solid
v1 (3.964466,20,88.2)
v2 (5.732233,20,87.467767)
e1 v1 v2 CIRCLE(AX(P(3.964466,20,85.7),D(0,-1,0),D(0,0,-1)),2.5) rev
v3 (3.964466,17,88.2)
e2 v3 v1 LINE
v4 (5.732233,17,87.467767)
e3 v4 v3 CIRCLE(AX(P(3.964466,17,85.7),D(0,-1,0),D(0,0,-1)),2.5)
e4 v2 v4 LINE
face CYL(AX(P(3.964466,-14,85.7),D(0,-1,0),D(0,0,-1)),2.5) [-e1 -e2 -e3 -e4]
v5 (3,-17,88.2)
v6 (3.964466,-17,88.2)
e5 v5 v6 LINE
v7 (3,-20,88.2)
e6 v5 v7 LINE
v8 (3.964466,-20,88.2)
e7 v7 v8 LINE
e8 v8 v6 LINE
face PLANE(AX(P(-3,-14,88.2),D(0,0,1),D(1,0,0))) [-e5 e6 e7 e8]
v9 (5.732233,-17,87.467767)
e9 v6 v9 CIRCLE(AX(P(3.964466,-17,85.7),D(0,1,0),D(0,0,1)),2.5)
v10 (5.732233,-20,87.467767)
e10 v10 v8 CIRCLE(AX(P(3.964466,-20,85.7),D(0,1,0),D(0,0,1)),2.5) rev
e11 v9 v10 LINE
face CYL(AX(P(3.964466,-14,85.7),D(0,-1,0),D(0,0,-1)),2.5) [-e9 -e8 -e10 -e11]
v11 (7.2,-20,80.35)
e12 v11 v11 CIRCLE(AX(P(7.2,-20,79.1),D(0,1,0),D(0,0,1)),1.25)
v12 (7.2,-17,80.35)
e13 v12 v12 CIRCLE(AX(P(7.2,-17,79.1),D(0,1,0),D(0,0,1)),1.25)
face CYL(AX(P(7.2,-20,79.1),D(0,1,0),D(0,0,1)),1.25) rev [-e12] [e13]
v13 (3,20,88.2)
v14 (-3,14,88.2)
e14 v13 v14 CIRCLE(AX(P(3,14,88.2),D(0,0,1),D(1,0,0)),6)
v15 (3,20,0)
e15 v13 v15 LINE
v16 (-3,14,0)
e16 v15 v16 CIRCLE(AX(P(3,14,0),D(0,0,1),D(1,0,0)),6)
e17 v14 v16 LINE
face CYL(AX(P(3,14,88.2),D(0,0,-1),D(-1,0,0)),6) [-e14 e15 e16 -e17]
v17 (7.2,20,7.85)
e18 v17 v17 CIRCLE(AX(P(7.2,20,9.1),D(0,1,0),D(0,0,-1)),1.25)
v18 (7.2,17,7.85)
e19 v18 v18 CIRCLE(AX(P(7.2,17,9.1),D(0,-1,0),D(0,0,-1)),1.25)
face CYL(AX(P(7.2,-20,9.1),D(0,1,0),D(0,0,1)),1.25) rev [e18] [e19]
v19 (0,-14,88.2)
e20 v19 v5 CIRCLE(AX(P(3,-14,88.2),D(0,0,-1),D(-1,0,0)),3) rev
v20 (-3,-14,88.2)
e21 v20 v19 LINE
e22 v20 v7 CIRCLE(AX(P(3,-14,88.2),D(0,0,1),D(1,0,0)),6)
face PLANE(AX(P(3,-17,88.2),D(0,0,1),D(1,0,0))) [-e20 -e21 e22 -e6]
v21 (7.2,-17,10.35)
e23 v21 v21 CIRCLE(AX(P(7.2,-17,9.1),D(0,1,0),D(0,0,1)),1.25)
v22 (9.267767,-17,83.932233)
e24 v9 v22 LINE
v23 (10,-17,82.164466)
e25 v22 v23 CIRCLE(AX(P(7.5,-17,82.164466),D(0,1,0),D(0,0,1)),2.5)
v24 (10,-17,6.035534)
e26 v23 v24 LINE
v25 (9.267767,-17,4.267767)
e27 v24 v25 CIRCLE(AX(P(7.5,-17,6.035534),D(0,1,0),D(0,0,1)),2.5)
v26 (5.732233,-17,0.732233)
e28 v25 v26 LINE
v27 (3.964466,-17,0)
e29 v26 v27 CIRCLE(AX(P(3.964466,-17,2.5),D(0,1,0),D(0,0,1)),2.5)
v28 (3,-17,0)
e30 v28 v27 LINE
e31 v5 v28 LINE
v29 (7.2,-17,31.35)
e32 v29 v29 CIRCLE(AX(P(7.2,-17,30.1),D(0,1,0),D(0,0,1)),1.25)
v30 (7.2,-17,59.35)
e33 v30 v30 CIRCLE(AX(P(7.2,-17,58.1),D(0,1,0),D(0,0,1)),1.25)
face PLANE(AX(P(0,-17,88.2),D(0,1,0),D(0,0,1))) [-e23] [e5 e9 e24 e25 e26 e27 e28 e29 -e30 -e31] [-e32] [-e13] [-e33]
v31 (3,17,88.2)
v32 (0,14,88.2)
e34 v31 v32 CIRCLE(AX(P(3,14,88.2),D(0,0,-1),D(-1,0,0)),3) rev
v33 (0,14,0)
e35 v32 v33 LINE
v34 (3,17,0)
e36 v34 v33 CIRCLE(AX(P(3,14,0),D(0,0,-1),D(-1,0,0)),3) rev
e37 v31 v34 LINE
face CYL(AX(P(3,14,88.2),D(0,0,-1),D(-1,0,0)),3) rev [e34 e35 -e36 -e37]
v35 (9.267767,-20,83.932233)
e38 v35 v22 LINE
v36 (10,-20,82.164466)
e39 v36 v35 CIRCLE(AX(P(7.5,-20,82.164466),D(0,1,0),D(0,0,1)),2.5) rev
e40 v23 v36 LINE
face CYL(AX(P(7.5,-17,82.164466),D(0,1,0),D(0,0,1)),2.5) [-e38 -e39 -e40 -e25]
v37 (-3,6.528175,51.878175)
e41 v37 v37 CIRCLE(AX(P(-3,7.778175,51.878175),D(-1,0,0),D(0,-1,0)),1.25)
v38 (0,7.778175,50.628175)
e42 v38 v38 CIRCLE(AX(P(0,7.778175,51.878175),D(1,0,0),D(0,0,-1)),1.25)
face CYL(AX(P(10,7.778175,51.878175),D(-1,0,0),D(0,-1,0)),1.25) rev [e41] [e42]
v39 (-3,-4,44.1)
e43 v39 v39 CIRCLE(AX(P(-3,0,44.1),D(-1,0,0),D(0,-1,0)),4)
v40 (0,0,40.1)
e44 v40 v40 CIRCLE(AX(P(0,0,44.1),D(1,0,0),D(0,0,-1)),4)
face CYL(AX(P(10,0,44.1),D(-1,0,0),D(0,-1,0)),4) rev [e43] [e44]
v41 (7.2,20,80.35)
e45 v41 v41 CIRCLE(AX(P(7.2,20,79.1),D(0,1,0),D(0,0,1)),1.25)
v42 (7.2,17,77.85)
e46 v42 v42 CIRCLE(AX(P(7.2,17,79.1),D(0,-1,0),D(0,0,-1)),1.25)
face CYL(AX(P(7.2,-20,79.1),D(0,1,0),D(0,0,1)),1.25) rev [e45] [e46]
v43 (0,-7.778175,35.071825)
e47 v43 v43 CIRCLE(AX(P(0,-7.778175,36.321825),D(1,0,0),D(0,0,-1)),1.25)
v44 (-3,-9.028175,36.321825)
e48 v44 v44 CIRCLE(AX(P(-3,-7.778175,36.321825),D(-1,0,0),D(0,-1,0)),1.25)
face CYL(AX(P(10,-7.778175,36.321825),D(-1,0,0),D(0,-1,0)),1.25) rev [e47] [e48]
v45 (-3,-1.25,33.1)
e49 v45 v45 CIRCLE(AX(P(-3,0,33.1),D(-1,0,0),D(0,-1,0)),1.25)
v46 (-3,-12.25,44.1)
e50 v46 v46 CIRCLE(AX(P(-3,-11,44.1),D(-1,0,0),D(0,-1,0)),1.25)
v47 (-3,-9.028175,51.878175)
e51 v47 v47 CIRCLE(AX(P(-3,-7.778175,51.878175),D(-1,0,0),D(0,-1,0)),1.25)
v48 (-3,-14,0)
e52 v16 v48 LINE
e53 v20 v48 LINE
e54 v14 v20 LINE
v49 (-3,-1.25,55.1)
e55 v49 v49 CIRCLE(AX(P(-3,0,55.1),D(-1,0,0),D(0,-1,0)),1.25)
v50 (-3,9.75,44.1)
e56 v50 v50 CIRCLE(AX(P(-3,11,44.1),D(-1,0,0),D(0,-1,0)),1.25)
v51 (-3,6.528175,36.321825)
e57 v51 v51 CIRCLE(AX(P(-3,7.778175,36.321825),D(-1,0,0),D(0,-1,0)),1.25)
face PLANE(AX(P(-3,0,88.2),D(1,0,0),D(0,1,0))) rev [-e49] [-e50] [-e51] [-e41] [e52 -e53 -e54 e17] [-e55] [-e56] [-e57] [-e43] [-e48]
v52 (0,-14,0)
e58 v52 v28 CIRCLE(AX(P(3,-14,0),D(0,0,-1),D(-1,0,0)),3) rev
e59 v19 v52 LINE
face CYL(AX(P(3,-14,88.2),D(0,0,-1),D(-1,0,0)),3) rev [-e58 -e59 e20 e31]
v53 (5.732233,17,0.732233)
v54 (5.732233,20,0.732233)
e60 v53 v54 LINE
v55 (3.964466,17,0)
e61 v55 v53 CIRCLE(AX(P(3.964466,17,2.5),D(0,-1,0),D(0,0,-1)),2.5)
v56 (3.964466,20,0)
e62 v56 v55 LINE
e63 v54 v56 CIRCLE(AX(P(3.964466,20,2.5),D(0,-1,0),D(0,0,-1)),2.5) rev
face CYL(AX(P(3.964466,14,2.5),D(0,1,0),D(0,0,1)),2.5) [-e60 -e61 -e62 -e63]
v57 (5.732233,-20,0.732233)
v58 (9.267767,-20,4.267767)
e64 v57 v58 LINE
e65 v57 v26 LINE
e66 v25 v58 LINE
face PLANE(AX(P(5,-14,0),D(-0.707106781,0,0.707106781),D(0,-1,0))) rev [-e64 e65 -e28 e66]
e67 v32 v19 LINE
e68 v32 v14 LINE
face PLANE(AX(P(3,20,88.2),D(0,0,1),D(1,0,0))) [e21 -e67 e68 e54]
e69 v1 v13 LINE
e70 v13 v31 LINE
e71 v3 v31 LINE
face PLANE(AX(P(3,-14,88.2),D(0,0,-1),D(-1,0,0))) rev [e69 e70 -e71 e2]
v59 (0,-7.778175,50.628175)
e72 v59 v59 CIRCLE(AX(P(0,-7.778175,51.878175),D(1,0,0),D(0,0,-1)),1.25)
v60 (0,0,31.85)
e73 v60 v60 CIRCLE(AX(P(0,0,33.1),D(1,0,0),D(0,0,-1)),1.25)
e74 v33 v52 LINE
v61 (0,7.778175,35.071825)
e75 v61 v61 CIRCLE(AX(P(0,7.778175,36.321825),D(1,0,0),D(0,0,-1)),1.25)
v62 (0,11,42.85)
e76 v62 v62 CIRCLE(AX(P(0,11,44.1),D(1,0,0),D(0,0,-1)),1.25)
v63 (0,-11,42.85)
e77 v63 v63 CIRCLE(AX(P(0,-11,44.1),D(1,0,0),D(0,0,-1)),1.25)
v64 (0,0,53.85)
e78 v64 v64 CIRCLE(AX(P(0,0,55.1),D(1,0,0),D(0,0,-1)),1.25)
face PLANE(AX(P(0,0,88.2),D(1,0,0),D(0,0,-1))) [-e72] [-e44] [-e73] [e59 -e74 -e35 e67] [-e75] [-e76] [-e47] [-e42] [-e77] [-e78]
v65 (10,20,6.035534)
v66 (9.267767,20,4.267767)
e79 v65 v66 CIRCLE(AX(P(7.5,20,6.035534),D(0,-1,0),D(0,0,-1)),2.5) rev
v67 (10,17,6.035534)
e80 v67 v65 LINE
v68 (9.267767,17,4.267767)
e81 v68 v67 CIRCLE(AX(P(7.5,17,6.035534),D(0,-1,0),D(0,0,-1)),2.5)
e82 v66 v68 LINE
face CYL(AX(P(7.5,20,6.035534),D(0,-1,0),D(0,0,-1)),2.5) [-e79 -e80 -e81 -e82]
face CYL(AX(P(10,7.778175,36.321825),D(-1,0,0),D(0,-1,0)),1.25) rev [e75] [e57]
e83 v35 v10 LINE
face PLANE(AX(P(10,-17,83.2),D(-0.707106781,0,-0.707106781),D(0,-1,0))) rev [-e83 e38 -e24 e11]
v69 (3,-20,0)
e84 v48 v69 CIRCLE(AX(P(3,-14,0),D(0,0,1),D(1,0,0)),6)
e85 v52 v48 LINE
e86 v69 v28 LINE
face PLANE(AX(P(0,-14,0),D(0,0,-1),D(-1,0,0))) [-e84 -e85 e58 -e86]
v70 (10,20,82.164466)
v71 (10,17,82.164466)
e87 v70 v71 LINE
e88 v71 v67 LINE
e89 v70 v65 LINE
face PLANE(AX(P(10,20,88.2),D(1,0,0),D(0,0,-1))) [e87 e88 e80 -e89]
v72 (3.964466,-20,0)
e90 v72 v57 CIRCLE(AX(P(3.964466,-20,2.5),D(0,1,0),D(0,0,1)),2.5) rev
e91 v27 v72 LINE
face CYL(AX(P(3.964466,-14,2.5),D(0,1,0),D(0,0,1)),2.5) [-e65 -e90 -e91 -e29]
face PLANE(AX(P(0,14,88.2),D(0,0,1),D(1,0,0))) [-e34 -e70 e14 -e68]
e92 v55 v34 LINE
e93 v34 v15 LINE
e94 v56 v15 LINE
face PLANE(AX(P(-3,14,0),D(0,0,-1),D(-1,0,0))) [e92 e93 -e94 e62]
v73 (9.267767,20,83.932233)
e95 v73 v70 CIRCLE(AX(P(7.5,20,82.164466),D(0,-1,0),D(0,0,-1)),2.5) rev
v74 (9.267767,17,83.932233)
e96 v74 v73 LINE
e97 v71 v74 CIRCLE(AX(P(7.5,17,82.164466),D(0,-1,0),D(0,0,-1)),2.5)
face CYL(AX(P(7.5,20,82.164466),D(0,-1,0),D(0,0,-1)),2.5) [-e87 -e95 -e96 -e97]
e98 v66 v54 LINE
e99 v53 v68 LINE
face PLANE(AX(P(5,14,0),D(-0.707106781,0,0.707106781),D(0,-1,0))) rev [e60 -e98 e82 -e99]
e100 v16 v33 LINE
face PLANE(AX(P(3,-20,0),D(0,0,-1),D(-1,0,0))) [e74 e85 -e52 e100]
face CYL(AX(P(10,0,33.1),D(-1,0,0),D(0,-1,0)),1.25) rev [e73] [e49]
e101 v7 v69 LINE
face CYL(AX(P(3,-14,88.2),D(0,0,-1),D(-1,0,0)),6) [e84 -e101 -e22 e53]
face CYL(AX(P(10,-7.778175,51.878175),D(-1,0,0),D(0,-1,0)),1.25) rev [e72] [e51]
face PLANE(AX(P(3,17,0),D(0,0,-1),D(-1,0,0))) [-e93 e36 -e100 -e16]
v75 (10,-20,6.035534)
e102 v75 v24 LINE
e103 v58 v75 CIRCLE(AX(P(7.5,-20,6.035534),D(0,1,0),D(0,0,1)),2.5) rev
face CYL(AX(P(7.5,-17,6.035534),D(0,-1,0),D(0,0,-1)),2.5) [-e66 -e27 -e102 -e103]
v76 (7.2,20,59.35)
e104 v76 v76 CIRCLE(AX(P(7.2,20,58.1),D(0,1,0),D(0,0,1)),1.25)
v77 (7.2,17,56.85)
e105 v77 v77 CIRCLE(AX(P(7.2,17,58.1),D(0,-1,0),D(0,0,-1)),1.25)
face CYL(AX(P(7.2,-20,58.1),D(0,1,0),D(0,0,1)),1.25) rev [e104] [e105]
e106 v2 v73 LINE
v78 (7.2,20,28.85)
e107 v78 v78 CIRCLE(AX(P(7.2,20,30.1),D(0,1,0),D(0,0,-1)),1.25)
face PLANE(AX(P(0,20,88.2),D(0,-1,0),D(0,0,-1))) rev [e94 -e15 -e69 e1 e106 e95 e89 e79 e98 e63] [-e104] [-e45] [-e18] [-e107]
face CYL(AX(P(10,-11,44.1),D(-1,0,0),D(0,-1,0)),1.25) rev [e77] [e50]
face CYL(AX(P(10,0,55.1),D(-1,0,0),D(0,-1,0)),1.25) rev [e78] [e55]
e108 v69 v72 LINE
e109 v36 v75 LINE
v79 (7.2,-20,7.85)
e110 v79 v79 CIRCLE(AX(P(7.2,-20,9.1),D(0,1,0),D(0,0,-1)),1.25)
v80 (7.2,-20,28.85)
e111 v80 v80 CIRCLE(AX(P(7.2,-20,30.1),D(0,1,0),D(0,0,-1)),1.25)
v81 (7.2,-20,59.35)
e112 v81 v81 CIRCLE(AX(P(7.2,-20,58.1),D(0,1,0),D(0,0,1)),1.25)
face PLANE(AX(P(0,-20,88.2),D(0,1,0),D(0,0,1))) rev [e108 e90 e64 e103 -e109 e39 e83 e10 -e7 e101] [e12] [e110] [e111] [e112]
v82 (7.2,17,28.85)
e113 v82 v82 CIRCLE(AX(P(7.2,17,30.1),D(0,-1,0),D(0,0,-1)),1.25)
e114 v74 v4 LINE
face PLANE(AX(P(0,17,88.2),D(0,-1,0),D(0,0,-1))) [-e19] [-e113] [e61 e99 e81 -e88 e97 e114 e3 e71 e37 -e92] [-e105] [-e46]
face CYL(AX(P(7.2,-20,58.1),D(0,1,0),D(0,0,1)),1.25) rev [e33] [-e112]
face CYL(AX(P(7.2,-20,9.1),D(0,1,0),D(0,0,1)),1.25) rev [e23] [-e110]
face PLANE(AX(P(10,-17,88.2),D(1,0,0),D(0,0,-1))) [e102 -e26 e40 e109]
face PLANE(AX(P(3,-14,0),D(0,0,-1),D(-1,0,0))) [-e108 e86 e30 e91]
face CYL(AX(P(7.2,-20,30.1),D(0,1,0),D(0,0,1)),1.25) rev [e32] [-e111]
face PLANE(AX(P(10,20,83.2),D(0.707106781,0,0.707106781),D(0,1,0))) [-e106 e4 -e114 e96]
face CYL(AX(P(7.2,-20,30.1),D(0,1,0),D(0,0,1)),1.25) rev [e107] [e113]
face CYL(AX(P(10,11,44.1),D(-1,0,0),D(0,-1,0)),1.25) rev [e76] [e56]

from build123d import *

# Parameters (mm, degrees)
BASE_FLANGE1_DEPTH = 88.2
CHAMFER1_SIZE      = 5
FILLET1_R          = 2.5
SKETCH4_R          = 4
CUT_EXTRUDE1_DEPTH = 92.368703613
SKETCH5_R          = 1.25
CUT_EXTRUDE2_DEPTH = 92.368703613
SKETCH6_R          = 1.25
CUT_EXTRUDE3_DEPTH = 98.361388651


# Sheet-metal steps are written as plain solids
with BuildPart() as part:
    # Sketch1 → Base-Flange1 (new body)
    with BuildSketch(Plane.XY):
        with BuildLine():
            Line((10, -17), (3, -17))
            ThreePointArc((3, -17), (0.878679656, -16.121320344), (0, -14))
            Line((0, -14), (0, 0))
            Line((0, 0), (0, 14))
            ThreePointArc((0, 14), (0.878679656, 16.121320344), (3, 17))
            Line((3, 17), (10, 17))
            Line((10, 17), (10, 20))
            Line((10, 20), (3, 20))
            ThreePointArc((3, 20), (-1.242640687, 18.242640687), (-3, 14))
            Line((-3, 14), (-3, 0))
            Line((-3, 0), (-3, -14))
            ThreePointArc((-3, -14), (-1.242640687, -18.242640687), (3, -20))
            Line((3, -20), (10, -20))
            Line((10, -20), (10, -17))
        make_face()
    extrude(amount=BASE_FLANGE1_DEPTH)

    # Chamfer1
    chamfer1_edges = [part.edges().sort_by_distance(p)[0] for p in [
        (10, 18.5, 0),
        (10, -18.5, 0),
        (10, 18.5, 88.2),
        (10, -18.5, 88.2),
    ]]
    chamfer(chamfer1_edges, length=CHAMFER1_SIZE)

    # Fillet1
    fillet1_edges = [part.edges().sort_by_distance(p)[0] for p in [
        (5, -18.5, 0),
        (10, -18.5, 83.2),
        (10, -18.5, 5),
        (5, 18.5, 0),
        (10, 18.5, 83.2),
        (10, 18.5, 5),
        (5, -18.5, 88.2),
        (5, 18.5, 88.2),
    ]]
    fillet(fillet1_edges, radius=FILLET1_R)

    # Sketch4 → Cut-Extrude1 (cut, through all)
    with BuildSketch(Plane.ZY.offset(3)):
        with Locations(Location((44.1, 0, 0), (0, 0, 270))):
            Circle(SKETCH4_R)
    extrude(amount=-CUT_EXTRUDE1_DEPTH, mode=Mode.SUBTRACT)

    # Sketch5 → Cut-Extrude2 (cut, through all)
    with BuildSketch(Plane.ZY.offset(3)):
        with Locations(Location((44.1, 11, 0), (0, 0, 270))):
            Circle(SKETCH5_R)
        with Locations(Location((51.878174593, 7.778174593, 0), (0, 0, 270))):
            Circle(SKETCH5_R)
        with Locations(Location((55.1, 0, 0), (0, 0, 270))):
            Circle(SKETCH5_R)
        with Locations(Location((51.878174593, -7.778174593, 0), (0, 0, 270))):
            Circle(SKETCH5_R)
        with Locations(Location((44.1, -11, 0), (0, 0, 270))):
            Circle(SKETCH5_R)
        with Locations(Location((36.321825407, -7.778174593, 0), (0, 0, 270))):
            Circle(SKETCH5_R)
        with Locations(Location((33.1, 0, 0), (0, 0, 270))):
            Circle(SKETCH5_R)
        with Locations(Location((36.321825407, 7.778174593, 0), (0, 0, 270))):
            Circle(SKETCH5_R)
    extrude(amount=-CUT_EXTRUDE2_DEPTH, mode=Mode.SUBTRACT)

    # Sketch6 → Cut-Extrude3 (cut, through all)
    with BuildSketch(Plane(origin=(0, 20, 0), x_dir=(1, 0, 0), z_dir=(0, 1, 0))):
        with Locations(Location((7.2, -79.1, 0), (0, 0, 270))):
            Circle(SKETCH6_R)
        with Locations(Location((7.2, -58.1, 0), (0, 0, 270))):
            Circle(SKETCH6_R)
        with Locations(Location((7.2, -30.1, 0), (0, 0, 90))):
            Circle(SKETCH6_R)
        with Locations(Location((7.2, -9.1, 0), (0, 0, 90))):
            Circle(SKETCH6_R)
    extrude(amount=-CUT_EXTRUDE3_DEPTH, mode=Mode.SUBTRACT)


solid = part.part
